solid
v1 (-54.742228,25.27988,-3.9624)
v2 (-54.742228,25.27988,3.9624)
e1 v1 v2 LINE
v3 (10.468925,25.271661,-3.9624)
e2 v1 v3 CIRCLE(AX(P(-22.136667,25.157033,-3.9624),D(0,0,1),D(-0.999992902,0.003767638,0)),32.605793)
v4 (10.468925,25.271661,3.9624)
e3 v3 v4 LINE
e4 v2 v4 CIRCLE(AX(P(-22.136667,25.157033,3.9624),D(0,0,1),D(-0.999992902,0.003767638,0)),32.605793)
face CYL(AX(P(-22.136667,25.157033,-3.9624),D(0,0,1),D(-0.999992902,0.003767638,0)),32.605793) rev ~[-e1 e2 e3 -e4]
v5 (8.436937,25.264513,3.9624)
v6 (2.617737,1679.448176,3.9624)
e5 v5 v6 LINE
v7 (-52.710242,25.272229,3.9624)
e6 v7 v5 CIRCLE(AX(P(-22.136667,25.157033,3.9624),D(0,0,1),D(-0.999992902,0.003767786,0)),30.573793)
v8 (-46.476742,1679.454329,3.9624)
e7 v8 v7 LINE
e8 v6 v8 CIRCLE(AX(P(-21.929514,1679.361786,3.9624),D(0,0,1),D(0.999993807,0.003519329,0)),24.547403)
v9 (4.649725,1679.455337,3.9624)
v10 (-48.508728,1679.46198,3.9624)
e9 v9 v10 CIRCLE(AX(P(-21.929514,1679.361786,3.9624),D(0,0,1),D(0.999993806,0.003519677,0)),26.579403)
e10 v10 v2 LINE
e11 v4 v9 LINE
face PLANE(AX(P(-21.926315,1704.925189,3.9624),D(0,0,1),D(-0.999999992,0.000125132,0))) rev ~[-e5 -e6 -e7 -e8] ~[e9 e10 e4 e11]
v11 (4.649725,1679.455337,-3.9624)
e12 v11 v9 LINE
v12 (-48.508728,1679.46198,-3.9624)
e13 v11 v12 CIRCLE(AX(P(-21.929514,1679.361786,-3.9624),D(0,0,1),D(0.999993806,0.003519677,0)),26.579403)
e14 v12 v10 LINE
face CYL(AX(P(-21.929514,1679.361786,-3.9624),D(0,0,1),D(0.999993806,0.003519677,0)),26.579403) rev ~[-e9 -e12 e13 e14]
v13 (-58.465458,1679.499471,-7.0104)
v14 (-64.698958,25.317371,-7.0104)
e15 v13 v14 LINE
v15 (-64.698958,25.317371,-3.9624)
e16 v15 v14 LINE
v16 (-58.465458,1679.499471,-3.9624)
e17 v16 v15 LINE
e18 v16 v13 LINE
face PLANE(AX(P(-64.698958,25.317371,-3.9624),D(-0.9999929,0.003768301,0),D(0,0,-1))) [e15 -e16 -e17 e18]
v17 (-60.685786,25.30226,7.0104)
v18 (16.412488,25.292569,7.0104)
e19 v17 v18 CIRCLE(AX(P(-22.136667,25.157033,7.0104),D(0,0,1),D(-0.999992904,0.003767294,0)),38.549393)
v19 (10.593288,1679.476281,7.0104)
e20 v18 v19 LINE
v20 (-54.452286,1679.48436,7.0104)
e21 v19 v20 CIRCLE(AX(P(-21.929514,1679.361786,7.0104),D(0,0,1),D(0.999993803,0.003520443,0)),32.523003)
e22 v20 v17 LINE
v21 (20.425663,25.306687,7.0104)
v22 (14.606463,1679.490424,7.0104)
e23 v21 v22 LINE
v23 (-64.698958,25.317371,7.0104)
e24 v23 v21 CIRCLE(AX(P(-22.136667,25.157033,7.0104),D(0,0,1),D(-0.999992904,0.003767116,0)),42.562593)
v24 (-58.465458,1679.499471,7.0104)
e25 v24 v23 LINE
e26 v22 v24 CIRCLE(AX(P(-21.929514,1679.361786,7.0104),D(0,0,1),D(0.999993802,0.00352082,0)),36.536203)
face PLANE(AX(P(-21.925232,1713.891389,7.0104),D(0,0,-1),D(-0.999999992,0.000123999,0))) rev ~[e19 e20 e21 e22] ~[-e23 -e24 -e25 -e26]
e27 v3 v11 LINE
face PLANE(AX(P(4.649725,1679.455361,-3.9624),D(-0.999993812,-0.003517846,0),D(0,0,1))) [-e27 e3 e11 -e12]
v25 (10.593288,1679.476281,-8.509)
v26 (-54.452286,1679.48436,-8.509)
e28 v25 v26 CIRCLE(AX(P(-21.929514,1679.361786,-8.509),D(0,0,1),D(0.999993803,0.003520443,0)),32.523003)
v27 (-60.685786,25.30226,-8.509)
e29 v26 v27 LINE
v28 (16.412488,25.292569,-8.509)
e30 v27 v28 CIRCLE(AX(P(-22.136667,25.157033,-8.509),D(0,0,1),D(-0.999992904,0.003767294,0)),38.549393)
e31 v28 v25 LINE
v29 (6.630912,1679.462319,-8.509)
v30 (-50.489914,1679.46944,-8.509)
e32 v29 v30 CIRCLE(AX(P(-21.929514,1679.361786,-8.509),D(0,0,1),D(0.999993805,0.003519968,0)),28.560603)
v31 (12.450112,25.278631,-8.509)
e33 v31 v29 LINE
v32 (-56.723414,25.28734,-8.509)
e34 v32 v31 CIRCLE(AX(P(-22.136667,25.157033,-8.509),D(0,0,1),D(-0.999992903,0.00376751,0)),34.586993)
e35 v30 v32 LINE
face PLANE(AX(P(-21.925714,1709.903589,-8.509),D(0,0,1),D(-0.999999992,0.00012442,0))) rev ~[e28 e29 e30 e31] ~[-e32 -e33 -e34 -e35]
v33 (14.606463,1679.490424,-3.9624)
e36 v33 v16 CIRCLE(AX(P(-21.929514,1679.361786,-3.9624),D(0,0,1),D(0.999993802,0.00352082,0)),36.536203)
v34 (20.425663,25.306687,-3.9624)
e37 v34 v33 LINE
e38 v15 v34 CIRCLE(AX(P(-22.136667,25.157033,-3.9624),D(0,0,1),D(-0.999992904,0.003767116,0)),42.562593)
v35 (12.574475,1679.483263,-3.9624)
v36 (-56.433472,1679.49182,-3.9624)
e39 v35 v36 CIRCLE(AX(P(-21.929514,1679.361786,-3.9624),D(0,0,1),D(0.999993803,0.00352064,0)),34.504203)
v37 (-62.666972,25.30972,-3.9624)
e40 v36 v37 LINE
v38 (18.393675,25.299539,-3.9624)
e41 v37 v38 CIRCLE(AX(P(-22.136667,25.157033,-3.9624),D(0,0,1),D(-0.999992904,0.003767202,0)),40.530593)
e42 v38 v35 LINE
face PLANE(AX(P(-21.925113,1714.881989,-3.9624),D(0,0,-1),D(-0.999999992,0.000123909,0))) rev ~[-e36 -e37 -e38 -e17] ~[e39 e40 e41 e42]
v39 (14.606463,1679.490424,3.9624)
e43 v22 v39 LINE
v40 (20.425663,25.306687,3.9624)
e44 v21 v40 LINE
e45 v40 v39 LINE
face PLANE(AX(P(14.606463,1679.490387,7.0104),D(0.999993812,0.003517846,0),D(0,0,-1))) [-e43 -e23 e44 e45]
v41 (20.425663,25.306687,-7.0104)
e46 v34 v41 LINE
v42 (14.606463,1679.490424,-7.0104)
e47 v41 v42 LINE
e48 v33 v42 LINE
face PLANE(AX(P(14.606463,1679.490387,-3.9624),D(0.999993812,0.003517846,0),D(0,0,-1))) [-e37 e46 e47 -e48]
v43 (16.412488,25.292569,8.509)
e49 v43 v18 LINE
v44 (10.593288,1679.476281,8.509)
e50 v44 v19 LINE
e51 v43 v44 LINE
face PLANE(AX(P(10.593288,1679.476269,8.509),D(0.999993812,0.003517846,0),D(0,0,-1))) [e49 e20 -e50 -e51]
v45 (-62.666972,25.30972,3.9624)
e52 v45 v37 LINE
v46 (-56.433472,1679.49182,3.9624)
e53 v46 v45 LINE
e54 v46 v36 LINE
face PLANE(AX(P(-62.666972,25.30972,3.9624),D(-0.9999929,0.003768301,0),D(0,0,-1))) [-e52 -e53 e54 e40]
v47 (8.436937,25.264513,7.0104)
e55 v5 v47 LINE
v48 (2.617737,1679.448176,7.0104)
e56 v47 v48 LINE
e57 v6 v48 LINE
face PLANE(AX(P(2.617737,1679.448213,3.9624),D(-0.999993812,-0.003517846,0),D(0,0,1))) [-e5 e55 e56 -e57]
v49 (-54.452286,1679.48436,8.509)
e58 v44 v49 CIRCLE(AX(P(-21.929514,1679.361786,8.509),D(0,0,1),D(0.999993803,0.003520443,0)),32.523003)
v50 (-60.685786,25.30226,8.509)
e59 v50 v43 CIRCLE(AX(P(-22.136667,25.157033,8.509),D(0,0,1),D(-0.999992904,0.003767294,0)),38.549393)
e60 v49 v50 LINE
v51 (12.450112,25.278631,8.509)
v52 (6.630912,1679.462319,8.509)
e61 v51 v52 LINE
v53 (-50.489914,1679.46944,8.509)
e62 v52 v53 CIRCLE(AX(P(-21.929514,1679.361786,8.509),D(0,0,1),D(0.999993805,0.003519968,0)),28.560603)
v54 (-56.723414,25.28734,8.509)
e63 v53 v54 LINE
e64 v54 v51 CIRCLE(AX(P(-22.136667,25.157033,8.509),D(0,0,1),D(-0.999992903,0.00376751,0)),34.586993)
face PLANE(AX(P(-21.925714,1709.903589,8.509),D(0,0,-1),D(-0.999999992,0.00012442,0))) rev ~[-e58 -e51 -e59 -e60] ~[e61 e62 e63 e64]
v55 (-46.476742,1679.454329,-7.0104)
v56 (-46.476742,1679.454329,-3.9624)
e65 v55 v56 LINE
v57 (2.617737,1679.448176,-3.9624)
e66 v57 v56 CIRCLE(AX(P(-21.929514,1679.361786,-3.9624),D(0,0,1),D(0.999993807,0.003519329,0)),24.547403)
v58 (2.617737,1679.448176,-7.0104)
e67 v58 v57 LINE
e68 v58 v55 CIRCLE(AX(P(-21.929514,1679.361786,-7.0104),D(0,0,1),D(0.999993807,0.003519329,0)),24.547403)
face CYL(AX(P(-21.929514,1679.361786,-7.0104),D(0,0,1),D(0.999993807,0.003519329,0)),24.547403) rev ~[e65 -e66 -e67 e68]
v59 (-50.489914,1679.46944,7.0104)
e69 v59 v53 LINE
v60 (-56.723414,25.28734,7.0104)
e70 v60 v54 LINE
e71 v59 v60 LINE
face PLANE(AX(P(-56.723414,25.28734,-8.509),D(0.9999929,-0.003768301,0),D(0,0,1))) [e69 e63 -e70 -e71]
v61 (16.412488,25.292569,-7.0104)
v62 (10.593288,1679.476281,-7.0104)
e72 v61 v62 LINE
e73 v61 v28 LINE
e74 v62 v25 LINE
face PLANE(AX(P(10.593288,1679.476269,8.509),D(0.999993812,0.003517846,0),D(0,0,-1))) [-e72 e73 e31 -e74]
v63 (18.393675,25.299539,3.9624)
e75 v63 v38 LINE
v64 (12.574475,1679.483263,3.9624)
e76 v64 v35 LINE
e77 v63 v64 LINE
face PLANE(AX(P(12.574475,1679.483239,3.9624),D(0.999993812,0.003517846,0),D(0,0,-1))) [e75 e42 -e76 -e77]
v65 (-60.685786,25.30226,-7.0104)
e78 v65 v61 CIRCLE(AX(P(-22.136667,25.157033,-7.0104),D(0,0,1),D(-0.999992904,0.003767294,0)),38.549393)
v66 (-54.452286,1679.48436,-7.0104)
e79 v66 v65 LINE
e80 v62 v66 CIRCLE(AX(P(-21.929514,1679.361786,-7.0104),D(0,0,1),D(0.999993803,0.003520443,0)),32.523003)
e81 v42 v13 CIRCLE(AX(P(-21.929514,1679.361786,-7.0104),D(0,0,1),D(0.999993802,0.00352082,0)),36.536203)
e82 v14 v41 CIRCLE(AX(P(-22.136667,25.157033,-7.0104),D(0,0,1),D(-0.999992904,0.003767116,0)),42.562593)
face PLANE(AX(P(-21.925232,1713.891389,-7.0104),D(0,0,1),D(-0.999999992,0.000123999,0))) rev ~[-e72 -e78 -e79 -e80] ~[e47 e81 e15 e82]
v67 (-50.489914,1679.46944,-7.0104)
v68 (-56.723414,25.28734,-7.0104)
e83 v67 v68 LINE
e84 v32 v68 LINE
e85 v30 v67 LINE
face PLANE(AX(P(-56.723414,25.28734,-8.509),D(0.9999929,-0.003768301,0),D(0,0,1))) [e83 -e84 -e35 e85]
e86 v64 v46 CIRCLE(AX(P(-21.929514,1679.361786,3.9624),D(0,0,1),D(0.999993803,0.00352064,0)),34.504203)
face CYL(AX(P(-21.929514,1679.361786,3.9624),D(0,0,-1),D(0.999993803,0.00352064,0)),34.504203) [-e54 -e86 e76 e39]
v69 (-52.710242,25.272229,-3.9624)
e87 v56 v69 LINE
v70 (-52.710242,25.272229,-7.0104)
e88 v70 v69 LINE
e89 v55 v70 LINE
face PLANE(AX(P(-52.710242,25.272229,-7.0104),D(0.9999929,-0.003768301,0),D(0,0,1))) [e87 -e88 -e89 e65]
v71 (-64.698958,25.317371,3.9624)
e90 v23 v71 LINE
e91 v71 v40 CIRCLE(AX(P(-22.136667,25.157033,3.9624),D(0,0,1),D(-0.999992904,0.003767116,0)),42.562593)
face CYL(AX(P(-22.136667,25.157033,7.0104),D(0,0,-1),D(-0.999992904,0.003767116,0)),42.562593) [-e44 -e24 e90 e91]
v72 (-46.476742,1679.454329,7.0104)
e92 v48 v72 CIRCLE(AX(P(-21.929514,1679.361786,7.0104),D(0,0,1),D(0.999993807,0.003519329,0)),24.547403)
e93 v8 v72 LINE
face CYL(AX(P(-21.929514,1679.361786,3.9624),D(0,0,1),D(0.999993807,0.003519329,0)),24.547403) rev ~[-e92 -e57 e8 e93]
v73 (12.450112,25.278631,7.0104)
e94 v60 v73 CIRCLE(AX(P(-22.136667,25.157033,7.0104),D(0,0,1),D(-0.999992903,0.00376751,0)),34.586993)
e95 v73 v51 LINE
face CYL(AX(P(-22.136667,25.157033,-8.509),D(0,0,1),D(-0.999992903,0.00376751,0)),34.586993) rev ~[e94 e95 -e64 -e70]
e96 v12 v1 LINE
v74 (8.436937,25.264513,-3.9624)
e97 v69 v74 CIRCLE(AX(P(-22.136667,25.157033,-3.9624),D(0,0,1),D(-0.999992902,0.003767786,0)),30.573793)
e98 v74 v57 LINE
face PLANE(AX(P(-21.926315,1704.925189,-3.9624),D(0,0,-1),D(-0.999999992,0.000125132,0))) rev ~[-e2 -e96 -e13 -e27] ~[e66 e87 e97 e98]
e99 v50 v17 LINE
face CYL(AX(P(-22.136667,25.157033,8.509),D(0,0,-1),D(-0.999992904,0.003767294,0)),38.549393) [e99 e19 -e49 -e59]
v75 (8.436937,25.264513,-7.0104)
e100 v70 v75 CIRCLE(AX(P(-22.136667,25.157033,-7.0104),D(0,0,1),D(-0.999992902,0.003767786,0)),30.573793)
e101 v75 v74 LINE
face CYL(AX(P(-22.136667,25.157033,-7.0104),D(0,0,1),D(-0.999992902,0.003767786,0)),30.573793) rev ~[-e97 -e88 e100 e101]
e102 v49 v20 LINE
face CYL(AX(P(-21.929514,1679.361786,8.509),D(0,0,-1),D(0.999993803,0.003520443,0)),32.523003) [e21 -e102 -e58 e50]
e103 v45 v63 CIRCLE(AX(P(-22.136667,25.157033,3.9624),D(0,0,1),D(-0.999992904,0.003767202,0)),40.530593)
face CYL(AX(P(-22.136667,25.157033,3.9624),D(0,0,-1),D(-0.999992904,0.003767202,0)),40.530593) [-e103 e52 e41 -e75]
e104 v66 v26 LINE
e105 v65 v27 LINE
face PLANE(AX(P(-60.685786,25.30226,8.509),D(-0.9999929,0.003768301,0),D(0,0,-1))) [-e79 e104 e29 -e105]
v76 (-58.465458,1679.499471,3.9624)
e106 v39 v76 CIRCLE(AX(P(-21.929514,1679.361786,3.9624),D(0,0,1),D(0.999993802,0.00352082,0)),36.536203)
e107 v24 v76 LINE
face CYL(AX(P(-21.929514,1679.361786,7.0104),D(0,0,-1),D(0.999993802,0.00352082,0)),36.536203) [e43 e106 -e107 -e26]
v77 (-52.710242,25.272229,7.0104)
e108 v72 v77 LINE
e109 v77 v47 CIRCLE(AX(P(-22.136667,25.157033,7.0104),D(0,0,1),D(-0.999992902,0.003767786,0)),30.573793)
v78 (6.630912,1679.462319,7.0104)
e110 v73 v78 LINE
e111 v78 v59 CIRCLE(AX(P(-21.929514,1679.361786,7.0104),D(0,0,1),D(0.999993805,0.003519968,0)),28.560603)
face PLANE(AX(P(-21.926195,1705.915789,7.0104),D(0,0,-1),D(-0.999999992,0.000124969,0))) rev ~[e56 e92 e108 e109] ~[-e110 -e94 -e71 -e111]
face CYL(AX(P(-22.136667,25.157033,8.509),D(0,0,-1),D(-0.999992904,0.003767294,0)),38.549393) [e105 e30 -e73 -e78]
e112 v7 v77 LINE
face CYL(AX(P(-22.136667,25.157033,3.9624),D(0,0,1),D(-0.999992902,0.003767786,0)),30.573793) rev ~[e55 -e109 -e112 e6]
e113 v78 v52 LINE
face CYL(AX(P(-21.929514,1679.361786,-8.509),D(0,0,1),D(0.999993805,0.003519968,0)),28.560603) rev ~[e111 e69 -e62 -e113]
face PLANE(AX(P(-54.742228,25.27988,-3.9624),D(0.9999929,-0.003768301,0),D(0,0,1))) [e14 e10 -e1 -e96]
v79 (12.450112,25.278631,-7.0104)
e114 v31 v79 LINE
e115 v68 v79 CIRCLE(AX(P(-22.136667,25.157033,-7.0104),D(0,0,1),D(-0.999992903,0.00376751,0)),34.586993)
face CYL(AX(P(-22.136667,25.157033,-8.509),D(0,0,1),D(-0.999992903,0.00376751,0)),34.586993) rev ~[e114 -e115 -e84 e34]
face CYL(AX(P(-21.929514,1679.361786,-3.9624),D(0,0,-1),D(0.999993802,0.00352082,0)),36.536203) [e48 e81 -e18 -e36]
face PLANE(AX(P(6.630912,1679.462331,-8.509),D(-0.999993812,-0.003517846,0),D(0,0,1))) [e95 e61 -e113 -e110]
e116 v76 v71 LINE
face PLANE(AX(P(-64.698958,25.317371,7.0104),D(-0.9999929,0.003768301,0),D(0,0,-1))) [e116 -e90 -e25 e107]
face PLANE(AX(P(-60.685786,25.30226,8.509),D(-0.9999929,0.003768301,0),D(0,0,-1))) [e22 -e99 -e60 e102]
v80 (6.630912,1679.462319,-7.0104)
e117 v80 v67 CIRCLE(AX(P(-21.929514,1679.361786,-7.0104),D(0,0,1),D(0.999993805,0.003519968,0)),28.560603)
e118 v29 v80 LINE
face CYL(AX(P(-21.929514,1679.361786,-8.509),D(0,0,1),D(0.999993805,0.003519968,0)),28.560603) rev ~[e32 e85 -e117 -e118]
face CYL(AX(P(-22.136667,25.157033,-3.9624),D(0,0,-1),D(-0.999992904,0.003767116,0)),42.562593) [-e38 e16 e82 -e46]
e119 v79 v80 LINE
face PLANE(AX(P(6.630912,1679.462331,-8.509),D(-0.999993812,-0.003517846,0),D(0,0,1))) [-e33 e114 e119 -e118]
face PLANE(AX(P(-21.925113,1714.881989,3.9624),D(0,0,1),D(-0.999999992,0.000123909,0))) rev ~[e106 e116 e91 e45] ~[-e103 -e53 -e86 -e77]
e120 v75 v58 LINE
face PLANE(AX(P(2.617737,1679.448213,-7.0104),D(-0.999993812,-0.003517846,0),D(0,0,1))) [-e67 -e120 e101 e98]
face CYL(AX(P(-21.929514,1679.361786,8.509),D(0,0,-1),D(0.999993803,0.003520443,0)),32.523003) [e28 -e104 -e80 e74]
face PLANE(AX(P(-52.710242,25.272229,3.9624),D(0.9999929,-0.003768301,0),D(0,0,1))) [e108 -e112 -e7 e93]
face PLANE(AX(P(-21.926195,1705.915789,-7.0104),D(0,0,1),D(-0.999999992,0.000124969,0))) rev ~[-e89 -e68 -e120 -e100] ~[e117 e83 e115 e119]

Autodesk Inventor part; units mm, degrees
ref_plane "Arbeitsebene2" through (-22.1367, 25.157, 0) normal (-1, 0, 0) x (0, 0, 1)
ref_plane "Arbeitsebene3" through (-21.9295, 1679.3618, 0) normal (-0.1021834, -0.9947656, 0) x (0, 0, 1)
sketch "Pfad" plane through (0, 0, 0) normal (0, 0, 1) x (1, 0, 0)
  arc A0 (-58.7046, 25.2948) -> (14.4313, 25.2856) centre (-22.1367, 25.157) ccw
  arc A1 (8.6121, 1679.4693) -> (-52.4711, 1679.4769) centre (-21.9295, 1679.3618) ccw
  line L0 (8.6121, 1679.4693) -> (14.4313, 25.2856)
  line L1 (-58.7046, 25.2948) -> (-52.4711, 1679.4769)
  dimension "d31" = 11.9888
ref_plane "Profilebene" through (14.4313, 25.2856, 0) normal (-0.0035178, 0.9999938, 0) x (0, 0, 1)
sketch "Profilskizze" plane through (14.4313, 25.2856, 0) normal (-0.0035178, 0.9999938, 0) x (0, 0, 1)
  line L0 (-8.509, -1.9812) -> (8.509, -1.9812)
  line L1 (8.509, -1.9812) -> (8.509, 1.9812)
  line L2 (8.509, 1.9812) -> (-8.509, 1.9812)
  line L3 (-8.509, 1.9812) -> (-8.509, -1.9812)
  line L4 (-3.9624, -3.9624) -> (3.9624, -3.9624)
  line L5 (3.9624, -3.9624) -> (3.9624, 3.9624)
  line L6 (3.9624, 3.9624) -> (-3.9624, 3.9624)
  line L7 (-3.9624, 3.9624) -> (-3.9624, -3.9624)
  line L8 (-3.9624, 0) -> (3.9624, 0) construction
  line L9 (-7.0104, -5.9944) -> (-3.9624, -5.9944)
  line L10 (-3.9624, -5.9944) -> (-3.9624, 5.9944)
  line L11 (-3.9624, 5.9944) -> (-7.0104, 5.9944)
  line L12 (-7.0104, 5.9944) -> (-7.0104, -5.9944)
  line L13 (3.9624, -5.9944) -> (7.0104, -5.9944)
  line L14 (7.0104, -5.9944) -> (7.0104, 5.9944)
  line L15 (7.0104, 5.9944) -> (3.9624, 5.9944)
  line L16 (3.9624, 5.9944) -> (3.9624, -5.9944)
  line L17 (-8.509, 0) -> (8.509, 0) construction
  point P0 (0, 0)
  point P1 (0, 0)
  dimension "d21" = 3.9624
  dimension "d22" = 7.9248
  dimension "d23" = 7.9248
  dimension "d24" = 3.048
  dimension "d31" = 11.9888
  dimension "d32" = 17.018
sweep "Volumenkörper" add profiles "Profilskizze" path "Pfad"
pattern_of_one "Strand Pattern"
equation "\"d21\" = da_d2"
equation "\"d22\" = da_d1"
equation "\"d23\" = da_b1"
equation "\"d24\" = da_t1 + da_t2"
equation "\"d30\" = da_pt"
equation "\"da_p\" = 12.7"
equation "\"da_b1\" = 7.9248"
equation "\"da_h2\" = 11.9888"
equation "\"da_h3\" = 10.3886"
equation "\"da_d1\" = 7.9248"
equation "\"da_d2\" = 3.9624"
equation "\"da_pt\" = 14.3764"
equation "\"da_b\" = 17.018"
equation "\"da_t1\" = 1.524"
equation "\"da_t2\" = 1.524"
properties part number "HTW-000643" material "Edelstahl"
